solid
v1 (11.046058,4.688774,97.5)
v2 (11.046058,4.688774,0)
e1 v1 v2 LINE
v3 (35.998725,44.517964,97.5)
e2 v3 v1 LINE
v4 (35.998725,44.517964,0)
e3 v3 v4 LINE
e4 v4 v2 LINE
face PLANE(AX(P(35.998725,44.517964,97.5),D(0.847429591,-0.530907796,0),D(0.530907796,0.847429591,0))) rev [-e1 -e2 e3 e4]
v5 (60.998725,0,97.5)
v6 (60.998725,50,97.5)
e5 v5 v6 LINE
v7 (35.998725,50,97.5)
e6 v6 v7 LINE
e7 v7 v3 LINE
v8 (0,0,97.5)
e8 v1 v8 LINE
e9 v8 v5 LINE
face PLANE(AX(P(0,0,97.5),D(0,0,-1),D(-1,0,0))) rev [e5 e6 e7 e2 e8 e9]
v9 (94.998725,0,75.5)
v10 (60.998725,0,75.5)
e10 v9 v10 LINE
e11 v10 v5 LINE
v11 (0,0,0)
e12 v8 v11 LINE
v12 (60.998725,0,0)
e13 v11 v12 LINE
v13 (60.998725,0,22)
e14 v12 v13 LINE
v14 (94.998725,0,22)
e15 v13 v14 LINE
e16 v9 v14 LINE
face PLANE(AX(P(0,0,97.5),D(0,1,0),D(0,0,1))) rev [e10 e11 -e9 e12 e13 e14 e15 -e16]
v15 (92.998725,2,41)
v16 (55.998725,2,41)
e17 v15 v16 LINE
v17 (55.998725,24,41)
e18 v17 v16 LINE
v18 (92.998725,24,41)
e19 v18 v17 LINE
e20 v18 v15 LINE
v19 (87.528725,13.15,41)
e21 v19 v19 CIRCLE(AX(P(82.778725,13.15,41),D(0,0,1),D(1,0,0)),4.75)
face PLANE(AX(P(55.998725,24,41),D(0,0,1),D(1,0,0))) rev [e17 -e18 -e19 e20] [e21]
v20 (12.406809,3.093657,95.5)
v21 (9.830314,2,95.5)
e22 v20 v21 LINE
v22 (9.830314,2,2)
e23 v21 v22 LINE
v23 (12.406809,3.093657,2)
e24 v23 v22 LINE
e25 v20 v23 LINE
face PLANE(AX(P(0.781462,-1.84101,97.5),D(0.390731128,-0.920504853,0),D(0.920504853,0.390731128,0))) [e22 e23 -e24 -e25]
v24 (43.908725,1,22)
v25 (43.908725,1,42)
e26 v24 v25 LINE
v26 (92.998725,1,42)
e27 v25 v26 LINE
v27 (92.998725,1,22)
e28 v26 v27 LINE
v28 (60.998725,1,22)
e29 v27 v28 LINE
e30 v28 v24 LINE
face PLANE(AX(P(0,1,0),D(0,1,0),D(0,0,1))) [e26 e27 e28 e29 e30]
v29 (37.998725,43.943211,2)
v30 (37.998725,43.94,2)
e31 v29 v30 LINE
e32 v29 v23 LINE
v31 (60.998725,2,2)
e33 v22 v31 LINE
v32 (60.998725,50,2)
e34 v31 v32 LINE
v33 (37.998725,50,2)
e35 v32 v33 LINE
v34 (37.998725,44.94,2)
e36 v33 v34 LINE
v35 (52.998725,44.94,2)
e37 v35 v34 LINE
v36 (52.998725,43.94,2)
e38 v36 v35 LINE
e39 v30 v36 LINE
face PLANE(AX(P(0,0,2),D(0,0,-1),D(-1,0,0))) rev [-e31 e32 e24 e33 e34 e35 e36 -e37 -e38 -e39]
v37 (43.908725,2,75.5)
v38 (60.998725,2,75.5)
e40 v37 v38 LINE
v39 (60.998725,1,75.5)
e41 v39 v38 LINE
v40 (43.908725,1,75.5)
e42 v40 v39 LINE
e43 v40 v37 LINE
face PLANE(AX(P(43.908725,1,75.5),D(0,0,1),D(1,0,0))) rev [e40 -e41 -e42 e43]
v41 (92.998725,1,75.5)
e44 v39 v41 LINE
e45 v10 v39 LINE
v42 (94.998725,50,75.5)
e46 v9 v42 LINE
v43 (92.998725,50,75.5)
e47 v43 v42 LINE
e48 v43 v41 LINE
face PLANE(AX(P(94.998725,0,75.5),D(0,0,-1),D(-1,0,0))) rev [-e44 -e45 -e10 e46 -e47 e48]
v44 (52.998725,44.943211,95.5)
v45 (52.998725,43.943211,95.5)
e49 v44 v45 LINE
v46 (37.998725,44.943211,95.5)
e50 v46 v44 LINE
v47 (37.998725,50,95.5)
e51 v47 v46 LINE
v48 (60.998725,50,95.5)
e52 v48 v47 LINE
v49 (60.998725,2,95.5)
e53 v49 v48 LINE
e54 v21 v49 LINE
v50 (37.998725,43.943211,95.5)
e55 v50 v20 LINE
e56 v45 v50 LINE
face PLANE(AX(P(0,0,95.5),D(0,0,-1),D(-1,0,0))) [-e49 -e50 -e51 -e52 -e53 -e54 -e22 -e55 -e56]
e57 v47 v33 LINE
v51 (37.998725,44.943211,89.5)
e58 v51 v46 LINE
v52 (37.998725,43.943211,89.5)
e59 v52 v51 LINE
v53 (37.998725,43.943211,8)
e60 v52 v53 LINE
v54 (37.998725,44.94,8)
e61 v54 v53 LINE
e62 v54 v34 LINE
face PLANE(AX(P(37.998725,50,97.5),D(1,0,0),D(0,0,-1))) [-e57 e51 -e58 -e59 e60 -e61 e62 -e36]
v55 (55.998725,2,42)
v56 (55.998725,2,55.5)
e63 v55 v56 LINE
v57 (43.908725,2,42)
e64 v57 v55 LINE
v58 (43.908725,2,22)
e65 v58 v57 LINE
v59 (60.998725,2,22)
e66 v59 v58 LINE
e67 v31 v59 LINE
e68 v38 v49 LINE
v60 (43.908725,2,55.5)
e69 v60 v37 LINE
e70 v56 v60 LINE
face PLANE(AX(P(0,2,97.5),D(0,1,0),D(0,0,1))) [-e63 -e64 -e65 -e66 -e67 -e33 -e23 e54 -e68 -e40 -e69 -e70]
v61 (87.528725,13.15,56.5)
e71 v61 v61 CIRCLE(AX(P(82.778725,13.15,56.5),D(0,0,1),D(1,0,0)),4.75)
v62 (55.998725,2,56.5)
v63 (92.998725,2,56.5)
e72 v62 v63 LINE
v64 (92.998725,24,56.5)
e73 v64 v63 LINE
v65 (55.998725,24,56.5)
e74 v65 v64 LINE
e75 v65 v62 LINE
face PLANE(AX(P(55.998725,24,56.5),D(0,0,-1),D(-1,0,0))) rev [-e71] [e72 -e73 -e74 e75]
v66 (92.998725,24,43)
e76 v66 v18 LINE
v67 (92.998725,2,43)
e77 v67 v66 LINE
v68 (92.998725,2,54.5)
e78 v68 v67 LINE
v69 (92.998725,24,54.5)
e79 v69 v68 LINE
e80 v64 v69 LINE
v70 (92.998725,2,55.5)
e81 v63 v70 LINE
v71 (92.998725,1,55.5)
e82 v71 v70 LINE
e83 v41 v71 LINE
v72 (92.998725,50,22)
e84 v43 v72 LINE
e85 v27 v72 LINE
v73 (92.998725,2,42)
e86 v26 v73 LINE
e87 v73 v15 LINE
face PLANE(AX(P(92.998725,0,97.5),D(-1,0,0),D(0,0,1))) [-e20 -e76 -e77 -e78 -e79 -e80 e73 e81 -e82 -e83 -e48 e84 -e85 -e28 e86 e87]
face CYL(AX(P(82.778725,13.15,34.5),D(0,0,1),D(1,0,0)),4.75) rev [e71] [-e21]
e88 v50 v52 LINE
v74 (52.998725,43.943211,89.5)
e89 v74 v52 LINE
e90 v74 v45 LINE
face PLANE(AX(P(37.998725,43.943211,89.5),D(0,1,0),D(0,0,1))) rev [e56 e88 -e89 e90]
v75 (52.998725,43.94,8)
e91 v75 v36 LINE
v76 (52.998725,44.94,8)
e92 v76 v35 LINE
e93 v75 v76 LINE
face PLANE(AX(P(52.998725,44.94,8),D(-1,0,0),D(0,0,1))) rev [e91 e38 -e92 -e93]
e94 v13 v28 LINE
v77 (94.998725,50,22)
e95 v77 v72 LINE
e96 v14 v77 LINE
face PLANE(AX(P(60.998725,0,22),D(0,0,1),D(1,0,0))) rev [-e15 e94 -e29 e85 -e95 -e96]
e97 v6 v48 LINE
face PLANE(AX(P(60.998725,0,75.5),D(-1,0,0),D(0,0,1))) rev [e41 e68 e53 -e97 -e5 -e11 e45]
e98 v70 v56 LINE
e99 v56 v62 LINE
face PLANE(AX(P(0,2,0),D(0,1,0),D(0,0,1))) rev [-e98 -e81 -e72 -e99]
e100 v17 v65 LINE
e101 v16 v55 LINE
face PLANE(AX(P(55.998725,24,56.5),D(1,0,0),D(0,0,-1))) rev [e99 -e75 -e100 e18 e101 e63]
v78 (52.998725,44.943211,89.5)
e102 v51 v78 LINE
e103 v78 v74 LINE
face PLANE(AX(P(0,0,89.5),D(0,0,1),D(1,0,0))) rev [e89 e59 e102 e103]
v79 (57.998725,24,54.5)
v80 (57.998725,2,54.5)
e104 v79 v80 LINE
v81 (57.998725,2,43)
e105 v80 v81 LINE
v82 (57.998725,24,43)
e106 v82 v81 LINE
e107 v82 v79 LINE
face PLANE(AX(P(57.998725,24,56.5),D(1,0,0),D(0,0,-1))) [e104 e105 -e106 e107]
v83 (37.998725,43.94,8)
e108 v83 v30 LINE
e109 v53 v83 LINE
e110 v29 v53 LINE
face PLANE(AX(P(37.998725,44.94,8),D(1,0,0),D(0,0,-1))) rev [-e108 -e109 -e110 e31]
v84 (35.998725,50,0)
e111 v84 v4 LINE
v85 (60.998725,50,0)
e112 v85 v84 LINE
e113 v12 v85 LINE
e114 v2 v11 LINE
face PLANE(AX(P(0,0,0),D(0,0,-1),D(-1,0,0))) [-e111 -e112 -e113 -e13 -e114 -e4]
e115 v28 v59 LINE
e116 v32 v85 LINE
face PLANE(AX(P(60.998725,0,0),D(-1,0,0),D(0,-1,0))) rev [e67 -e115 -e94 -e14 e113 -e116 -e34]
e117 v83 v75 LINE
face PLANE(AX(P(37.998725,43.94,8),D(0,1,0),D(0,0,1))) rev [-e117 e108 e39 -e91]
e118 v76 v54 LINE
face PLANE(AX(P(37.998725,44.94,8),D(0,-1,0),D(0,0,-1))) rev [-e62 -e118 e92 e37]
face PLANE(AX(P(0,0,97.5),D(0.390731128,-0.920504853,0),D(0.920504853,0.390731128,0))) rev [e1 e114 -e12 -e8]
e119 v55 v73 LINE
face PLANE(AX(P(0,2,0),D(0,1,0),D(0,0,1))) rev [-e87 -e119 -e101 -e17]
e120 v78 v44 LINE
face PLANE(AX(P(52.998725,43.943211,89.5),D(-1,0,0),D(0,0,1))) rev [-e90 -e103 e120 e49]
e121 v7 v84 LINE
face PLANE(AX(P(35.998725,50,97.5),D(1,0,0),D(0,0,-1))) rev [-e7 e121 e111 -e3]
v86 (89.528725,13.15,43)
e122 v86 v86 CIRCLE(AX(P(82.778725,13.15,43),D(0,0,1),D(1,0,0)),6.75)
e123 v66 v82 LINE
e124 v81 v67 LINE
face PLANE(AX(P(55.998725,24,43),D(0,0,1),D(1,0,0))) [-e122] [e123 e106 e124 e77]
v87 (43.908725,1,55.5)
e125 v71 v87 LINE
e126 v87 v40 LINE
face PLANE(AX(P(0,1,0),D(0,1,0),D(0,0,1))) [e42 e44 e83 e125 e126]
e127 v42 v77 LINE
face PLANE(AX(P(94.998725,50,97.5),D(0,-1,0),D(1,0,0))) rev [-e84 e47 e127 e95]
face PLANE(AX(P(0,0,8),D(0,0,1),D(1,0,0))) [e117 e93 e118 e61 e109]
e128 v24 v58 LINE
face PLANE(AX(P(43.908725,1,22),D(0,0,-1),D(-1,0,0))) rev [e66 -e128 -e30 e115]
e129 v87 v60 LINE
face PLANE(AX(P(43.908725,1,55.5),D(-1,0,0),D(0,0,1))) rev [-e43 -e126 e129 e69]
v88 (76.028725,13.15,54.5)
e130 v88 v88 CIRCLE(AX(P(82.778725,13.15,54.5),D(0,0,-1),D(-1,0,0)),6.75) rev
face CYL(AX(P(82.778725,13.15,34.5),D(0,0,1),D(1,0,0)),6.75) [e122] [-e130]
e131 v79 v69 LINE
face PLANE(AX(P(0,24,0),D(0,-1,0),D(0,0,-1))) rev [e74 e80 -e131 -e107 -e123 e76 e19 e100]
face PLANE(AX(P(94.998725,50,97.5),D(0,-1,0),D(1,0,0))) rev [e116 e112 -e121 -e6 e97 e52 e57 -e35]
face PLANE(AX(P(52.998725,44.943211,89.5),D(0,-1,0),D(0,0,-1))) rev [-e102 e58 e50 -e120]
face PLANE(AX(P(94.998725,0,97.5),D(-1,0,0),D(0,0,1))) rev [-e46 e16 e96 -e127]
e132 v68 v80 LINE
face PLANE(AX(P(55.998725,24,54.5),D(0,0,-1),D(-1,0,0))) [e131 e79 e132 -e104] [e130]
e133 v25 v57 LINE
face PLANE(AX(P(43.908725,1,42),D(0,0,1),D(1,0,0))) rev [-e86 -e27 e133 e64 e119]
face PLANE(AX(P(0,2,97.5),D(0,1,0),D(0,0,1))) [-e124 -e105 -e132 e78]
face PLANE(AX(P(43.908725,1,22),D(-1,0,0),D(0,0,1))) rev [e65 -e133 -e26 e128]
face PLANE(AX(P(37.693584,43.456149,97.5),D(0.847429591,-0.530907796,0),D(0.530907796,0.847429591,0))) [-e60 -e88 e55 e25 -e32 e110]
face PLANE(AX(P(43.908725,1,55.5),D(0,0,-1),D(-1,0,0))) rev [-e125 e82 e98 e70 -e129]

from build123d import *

# Parameters (mm, degrees)
SALIENTE_EXTRUIR1_DEPTH    = 97.5
VACIADO1_T                 = -2
CORTAR_EXTRUIR1_DEPTH      = 146.020714686
CORTAR_EXTRUIR1_DEPTH_BACK = 146.020714686
CROQUIS2_W                 = 34
CROQUIS2_H                 = 22
CROQUIS5_W                 = 37
CROQUIS5_H                 = 15.5
SALIENTE_EXTRUIR3_DEPTH    = 22
CROQUIS7_R                 = 4.75
CORTAR_EXTRUIR2_DEPTH      = 22
VACIADO2_START             = 43
VACIADO2_OUTLINE_W         = 35
VACIADO2_OUTLINE_H         = 22
VACIADO2_OUTLINE_R         = 6.75
VACIADO2_DEPTH             = 11.5
CROQUIS9_W                 = 49.09
CROQUIS9_H                 = 20
CORTAR_EXTRUIR3_DEPTH      = 1
CROQUIS11_W                = 15
CROQUIS11_H                = 1
SALIENTE_EXTRUIR7_DEPTH    = 6
CROQUIS15_W                = 15
CROQUIS15_H                = 1
SALIENTE_EXTRUIR8_DEPTH    = 6


# Read off the part's stored shape, not the designer's step: Vaciado2
with BuildPart() as part:
    # Croquis1 → Saliente-Extruir1 (new body)
    with BuildSketch(Plane.XY):
        Polygon((0, 0), (94.998724665, 0), (94.998724665, 50), (35.998724665, 50), (35.998724665, 44.517964324), (11.046058241, 4.688773542), align=None)
    extrude(amount=SALIENTE_EXTRUIR1_DEPTH)

    # Vaciado1
    vaciado1_openings = [part.faces().sort_by_distance(p)[0] for p in [
        (65.498724665, 50, 48.75),
    ]]
    offset(amount=VACIADO1_T, openings=vaciado1_openings, kind=Kind.INTERSECTION)

    # Croquis2 → Cortar-Extruir1 (cut, two sides: drawn at the far end of the back side and taken through both)
    with BuildSketch(Plane(origin=(0, 50, 0), x_dir=(1, 0, 0), z_dir=(0, 1, 0)).offset(-CORTAR_EXTRUIR1_DEPTH_BACK)):
        with Locations((77.998724665, -11)):
            Rectangle(CROQUIS2_W, CROQUIS2_H)
        with Locations((77.998724665, -86.5)):
            Rectangle(CROQUIS2_W, CROQUIS2_H)
    extrude(amount=CORTAR_EXTRUIR1_DEPTH + CORTAR_EXTRUIR1_DEPTH_BACK, mode=Mode.SUBTRACT)

    # Croquis5 → Saliente-Extruir3 (add)
    with BuildSketch(Plane(origin=(0, 2, 0), x_dir=(1, 0, 0), z_dir=(0, 1, 0))):
        with Locations((74.498724665, -48.75)):
            Rectangle(CROQUIS5_W, CROQUIS5_H)
    extrude(amount=SALIENTE_EXTRUIR3_DEPTH)

    # Croquis7 → Cortar-Extruir2 (cut)
    with BuildSketch(Plane.XY.offset(56.5)):
        with Locations((82.778724665, 13.15)):
            Circle(CROQUIS7_R)
    extrude(amount=-CORTAR_EXTRUIR2_DEPTH, mode=Mode.SUBTRACT)

    # Vaciado2 outline → Vaciado2 (cut)
    with BuildSketch(Plane.XY.offset(VACIADO2_START)):
        with Locations((75.498724665, 13)):
            Rectangle(VACIADO2_OUTLINE_W, VACIADO2_OUTLINE_H)
        with Locations((82.778724665, 13.15)):
            Circle(VACIADO2_OUTLINE_R, mode=Mode.SUBTRACT)
    extrude(amount=VACIADO2_DEPTH, mode=Mode.SUBTRACT)

    # Croquis9 → Cortar-Extruir3 (cut)
    with BuildSketch(Plane(origin=(0, 2, 0), x_dir=(1, 0, 0), z_dir=(0, 1, 0))):
        with Locations((68.453724665, -32)):
            Rectangle(CROQUIS9_W, CROQUIS9_H)
        with Locations((68.453724665, -65.5)):
            Rectangle(CROQUIS9_W, CROQUIS9_H)
    extrude(amount=-CORTAR_EXTRUIR3_DEPTH, mode=Mode.SUBTRACT)

    # Croquis11 → Saliente-Extruir7 (add)
    with BuildSketch(Plane(origin=(0, 0, 95.5), x_dir=(-1, 0, 0), z_dir=(0, 0, -1))):
        with Locations((-45.498724665, 44.443211382)):
            Rectangle(CROQUIS11_W, CROQUIS11_H)
    extrude(amount=SALIENTE_EXTRUIR7_DEPTH)

    # Croquis15 → Saliente-Extruir8 (add)
    with BuildSketch(Plane.XY.offset(2)):
        with Locations((45.498724665, 44.44)):
            Rectangle(CROQUIS15_W, CROQUIS15_H)
    extrude(amount=SALIENTE_EXTRUIR8_DEPTH)


solid = part.part
